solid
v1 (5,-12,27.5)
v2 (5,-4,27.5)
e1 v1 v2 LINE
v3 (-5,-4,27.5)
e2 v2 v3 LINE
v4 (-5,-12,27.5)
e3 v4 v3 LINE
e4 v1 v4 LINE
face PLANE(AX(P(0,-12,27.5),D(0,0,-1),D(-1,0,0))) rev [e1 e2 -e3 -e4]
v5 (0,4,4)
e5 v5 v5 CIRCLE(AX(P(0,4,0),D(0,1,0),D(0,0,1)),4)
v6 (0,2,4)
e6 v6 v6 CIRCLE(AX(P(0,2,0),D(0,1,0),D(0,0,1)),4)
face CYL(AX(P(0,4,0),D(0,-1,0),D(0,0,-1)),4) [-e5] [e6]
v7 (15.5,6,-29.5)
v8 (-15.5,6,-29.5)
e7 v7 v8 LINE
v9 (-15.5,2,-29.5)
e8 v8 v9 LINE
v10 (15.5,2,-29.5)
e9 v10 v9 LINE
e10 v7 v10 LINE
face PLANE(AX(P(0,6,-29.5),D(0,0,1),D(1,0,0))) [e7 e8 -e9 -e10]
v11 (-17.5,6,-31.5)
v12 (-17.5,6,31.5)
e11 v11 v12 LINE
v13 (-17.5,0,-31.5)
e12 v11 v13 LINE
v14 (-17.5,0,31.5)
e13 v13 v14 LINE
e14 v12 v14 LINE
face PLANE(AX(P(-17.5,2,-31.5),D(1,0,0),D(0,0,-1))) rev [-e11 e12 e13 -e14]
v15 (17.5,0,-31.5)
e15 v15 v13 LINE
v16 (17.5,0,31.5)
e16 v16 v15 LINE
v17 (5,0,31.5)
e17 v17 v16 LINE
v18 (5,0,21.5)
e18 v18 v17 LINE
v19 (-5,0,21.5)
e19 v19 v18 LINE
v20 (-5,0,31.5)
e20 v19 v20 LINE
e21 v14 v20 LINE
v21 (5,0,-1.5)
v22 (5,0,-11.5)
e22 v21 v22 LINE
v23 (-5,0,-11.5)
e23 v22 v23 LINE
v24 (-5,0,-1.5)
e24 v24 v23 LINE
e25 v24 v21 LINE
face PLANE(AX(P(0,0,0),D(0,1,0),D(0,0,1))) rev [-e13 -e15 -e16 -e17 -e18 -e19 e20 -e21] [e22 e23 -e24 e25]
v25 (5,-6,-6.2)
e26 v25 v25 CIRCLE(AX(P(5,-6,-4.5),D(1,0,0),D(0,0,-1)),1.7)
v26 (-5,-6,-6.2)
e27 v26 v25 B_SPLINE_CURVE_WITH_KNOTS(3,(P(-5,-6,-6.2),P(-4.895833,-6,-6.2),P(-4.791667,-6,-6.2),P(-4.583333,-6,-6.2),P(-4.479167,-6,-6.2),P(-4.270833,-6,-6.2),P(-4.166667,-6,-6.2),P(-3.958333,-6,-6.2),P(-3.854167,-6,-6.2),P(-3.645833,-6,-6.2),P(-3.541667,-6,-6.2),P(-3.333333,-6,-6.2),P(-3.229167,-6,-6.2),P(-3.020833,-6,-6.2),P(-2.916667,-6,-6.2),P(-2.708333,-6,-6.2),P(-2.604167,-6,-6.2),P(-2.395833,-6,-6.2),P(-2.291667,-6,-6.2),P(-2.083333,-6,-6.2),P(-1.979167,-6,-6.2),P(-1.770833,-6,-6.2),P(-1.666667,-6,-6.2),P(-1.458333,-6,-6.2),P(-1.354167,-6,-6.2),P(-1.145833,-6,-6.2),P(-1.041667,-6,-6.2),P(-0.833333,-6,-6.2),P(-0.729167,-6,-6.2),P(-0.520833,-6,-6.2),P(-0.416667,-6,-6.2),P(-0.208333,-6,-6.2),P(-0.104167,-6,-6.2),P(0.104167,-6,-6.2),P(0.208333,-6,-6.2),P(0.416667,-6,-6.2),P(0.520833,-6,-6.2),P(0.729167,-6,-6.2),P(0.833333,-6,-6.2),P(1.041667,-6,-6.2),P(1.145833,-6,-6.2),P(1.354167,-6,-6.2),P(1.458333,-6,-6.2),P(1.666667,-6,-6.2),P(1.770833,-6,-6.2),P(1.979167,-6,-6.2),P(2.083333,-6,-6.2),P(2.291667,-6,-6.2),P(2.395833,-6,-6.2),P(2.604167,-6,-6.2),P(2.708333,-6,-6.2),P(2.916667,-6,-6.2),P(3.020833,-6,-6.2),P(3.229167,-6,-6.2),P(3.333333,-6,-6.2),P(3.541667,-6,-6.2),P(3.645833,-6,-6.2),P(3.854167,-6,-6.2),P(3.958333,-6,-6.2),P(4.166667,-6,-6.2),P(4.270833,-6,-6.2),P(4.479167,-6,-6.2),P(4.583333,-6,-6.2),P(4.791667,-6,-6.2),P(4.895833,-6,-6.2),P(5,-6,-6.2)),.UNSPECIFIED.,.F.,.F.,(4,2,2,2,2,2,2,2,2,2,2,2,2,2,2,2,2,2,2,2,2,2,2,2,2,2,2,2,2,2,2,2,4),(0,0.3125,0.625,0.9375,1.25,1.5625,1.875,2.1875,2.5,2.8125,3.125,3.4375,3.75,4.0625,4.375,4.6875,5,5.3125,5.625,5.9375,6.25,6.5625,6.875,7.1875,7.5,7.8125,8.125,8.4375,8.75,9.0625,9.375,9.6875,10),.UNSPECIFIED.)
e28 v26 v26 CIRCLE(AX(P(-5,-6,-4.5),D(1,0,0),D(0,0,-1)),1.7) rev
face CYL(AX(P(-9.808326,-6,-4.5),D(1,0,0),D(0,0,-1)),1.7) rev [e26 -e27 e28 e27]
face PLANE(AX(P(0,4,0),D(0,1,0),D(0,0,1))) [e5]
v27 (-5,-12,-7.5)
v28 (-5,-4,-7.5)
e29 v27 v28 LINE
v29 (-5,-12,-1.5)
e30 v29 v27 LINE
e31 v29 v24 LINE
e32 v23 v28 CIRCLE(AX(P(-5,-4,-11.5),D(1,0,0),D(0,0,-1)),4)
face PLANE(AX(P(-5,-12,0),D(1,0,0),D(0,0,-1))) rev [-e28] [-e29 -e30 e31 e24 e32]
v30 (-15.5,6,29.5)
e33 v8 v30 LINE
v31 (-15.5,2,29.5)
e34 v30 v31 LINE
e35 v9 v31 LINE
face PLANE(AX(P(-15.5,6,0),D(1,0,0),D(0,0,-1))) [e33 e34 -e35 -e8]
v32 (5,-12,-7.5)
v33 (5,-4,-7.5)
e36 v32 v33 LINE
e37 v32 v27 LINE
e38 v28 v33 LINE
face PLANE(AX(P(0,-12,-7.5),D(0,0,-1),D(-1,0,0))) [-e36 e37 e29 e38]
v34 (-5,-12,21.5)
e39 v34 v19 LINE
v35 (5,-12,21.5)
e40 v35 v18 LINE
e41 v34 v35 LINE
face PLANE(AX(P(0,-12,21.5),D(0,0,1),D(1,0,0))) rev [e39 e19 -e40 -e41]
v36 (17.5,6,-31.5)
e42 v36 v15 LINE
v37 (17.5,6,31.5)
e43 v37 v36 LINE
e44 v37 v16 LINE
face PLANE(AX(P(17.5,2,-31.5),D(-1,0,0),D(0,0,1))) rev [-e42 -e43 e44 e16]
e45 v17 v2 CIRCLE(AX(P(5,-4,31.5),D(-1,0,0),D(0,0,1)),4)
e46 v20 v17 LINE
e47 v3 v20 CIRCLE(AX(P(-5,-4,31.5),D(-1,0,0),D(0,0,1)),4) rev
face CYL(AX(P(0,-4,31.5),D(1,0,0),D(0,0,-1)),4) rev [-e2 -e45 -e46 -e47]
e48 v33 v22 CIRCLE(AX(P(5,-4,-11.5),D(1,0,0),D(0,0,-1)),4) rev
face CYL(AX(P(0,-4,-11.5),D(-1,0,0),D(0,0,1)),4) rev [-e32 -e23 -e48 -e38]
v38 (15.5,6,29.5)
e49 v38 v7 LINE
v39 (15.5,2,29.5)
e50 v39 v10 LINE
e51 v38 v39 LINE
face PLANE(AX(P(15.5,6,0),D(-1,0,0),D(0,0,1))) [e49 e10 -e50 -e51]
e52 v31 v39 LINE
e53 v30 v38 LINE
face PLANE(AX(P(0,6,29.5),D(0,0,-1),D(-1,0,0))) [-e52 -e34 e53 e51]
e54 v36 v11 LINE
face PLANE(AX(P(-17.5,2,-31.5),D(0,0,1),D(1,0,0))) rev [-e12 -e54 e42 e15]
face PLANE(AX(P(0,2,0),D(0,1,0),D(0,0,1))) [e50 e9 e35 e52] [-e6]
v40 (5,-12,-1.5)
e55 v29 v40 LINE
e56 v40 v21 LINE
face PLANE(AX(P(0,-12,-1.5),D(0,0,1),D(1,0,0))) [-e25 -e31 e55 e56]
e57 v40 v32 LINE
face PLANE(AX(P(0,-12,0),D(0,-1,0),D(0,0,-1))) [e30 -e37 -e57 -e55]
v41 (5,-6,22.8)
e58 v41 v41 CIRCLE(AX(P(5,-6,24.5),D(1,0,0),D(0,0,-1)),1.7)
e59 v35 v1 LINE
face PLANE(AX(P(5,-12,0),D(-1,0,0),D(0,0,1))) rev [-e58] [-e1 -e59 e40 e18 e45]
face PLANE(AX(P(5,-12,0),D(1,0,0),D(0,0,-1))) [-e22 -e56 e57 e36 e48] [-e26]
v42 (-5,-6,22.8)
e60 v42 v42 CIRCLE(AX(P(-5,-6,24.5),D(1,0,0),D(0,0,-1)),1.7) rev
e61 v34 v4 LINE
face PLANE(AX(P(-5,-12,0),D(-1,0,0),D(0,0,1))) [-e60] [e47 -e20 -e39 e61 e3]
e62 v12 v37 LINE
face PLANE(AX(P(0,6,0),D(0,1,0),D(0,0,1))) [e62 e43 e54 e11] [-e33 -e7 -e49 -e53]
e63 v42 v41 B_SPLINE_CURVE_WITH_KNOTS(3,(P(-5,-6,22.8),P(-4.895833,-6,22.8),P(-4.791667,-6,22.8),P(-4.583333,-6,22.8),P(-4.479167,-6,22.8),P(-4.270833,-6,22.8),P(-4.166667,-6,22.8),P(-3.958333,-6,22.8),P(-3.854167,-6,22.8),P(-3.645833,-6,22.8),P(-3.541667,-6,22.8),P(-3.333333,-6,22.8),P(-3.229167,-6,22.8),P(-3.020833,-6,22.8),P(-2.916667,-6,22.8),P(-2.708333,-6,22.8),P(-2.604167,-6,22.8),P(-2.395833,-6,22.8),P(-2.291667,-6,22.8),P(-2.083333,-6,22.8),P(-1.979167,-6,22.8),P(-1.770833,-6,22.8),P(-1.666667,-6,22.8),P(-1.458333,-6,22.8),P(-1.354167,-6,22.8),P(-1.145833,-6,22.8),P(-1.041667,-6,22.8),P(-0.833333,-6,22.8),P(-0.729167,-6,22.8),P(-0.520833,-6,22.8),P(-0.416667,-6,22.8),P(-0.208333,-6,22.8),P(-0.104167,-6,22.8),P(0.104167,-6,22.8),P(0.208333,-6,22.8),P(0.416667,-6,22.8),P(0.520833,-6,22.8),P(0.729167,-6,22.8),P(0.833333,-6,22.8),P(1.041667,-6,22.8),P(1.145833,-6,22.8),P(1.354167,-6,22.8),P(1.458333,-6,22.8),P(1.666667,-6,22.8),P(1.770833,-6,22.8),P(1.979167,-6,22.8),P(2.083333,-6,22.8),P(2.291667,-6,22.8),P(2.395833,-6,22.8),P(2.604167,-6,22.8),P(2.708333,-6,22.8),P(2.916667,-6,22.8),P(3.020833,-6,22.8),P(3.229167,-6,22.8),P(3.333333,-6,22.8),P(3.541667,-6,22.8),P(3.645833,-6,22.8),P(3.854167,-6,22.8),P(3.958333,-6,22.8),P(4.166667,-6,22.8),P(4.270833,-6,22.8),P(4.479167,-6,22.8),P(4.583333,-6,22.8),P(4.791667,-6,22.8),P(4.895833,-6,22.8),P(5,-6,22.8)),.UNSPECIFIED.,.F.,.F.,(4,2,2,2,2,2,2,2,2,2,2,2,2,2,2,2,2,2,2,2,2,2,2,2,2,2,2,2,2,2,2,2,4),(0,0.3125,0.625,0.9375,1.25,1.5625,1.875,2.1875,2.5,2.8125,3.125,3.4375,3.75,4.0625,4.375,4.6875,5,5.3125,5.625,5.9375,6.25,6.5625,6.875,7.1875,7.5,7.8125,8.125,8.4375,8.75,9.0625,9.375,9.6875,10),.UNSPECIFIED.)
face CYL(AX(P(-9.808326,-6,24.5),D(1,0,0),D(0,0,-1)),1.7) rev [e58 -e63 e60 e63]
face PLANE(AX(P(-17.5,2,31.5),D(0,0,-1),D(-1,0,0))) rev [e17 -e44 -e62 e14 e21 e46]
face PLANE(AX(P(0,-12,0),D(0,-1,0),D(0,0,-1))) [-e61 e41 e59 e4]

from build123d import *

# Parameters (mm, degrees)
SKETCH1_W           = 35
SKETCH1_H           = 63
BOSS_EXTRUDE1_DEPTH = 2
SKETCH2_W           = 10
SKETCH2_H           = 6
BOSS_EXTRUDE2_DEPTH = 12
SKETCH3_R           = 1.7
CUT_EXTRUDE1_DEPTH  = 10
FILLET1_R           = 4
SKETCH4_W           = 35
SKETCH4_H           = 63
SKETCH4_W_2         = 31
SKETCH4_H_2         = 59
BOSS_EXTRUDE4_DEPTH = 4
SKETCH5_R           = 4
BOSS_EXTRUDE5_DEPTH = 2


with BuildPart() as part:
    # Sketch1 → Boss-Extrude1 (new body)
    with BuildSketch(Plane(origin=(0, 0, 0), x_dir=(1, 0, 0), z_dir=(0, 1, 0))):
        Rectangle(SKETCH1_W, SKETCH1_H)
    extrude(amount=BOSS_EXTRUDE1_DEPTH)

    # Sketch2 → Boss-Extrude2 (add)
    with BuildSketch(Plane.XZ):
        with Locations((0, 24.5)):
            Rectangle(SKETCH2_W, SKETCH2_H)
        with Locations((0, -4.5)):
            Rectangle(SKETCH2_W, SKETCH2_H)
    extrude(amount=BOSS_EXTRUDE2_DEPTH)

    # Sketch3 → Cut-Extrude1 (cut)
    with BuildSketch(Plane(origin=(5, 0, 0), x_dir=(0, 0, -1), z_dir=(1, 0, 0))):
        with Locations((4.5, -6)):
            Circle(SKETCH3_R)
        with Locations((-24.5, -6)):
            Circle(SKETCH3_R)
    extrude(amount=-CUT_EXTRUDE1_DEPTH, mode=Mode.SUBTRACT)

    # Fillet1
    fillet1_edges = [part.edges().sort_by_distance(p)[0] for p in [
        (0, 0, 27.5),
        (0, 0, -7.5),
    ]]
    fillet(fillet1_edges, radius=FILLET1_R - 0.0001)  # a hair under: the kernel refuses the full size

    # Sketch4 → Boss-Extrude4 (add)
    with BuildSketch(Plane(origin=(0, 2, 0), x_dir=(1, 0, 0), z_dir=(0, 1, 0))):
        Rectangle(SKETCH4_W, SKETCH4_H)
        Rectangle(SKETCH4_W_2, SKETCH4_H_2, mode=Mode.SUBTRACT)
    extrude(amount=BOSS_EXTRUDE4_DEPTH)

    # Sketch5 → Boss-Extrude5 (add)
    with BuildSketch(Plane(origin=(0, 2, 0), x_dir=(1, 0, 0), z_dir=(0, 1, 0))):
        with Locations(Location((0, 0, 0), (0, 0, 270))):
            Circle(SKETCH5_R)
    extrude(amount=BOSS_EXTRUDE5_DEPTH)


solid = part.part
